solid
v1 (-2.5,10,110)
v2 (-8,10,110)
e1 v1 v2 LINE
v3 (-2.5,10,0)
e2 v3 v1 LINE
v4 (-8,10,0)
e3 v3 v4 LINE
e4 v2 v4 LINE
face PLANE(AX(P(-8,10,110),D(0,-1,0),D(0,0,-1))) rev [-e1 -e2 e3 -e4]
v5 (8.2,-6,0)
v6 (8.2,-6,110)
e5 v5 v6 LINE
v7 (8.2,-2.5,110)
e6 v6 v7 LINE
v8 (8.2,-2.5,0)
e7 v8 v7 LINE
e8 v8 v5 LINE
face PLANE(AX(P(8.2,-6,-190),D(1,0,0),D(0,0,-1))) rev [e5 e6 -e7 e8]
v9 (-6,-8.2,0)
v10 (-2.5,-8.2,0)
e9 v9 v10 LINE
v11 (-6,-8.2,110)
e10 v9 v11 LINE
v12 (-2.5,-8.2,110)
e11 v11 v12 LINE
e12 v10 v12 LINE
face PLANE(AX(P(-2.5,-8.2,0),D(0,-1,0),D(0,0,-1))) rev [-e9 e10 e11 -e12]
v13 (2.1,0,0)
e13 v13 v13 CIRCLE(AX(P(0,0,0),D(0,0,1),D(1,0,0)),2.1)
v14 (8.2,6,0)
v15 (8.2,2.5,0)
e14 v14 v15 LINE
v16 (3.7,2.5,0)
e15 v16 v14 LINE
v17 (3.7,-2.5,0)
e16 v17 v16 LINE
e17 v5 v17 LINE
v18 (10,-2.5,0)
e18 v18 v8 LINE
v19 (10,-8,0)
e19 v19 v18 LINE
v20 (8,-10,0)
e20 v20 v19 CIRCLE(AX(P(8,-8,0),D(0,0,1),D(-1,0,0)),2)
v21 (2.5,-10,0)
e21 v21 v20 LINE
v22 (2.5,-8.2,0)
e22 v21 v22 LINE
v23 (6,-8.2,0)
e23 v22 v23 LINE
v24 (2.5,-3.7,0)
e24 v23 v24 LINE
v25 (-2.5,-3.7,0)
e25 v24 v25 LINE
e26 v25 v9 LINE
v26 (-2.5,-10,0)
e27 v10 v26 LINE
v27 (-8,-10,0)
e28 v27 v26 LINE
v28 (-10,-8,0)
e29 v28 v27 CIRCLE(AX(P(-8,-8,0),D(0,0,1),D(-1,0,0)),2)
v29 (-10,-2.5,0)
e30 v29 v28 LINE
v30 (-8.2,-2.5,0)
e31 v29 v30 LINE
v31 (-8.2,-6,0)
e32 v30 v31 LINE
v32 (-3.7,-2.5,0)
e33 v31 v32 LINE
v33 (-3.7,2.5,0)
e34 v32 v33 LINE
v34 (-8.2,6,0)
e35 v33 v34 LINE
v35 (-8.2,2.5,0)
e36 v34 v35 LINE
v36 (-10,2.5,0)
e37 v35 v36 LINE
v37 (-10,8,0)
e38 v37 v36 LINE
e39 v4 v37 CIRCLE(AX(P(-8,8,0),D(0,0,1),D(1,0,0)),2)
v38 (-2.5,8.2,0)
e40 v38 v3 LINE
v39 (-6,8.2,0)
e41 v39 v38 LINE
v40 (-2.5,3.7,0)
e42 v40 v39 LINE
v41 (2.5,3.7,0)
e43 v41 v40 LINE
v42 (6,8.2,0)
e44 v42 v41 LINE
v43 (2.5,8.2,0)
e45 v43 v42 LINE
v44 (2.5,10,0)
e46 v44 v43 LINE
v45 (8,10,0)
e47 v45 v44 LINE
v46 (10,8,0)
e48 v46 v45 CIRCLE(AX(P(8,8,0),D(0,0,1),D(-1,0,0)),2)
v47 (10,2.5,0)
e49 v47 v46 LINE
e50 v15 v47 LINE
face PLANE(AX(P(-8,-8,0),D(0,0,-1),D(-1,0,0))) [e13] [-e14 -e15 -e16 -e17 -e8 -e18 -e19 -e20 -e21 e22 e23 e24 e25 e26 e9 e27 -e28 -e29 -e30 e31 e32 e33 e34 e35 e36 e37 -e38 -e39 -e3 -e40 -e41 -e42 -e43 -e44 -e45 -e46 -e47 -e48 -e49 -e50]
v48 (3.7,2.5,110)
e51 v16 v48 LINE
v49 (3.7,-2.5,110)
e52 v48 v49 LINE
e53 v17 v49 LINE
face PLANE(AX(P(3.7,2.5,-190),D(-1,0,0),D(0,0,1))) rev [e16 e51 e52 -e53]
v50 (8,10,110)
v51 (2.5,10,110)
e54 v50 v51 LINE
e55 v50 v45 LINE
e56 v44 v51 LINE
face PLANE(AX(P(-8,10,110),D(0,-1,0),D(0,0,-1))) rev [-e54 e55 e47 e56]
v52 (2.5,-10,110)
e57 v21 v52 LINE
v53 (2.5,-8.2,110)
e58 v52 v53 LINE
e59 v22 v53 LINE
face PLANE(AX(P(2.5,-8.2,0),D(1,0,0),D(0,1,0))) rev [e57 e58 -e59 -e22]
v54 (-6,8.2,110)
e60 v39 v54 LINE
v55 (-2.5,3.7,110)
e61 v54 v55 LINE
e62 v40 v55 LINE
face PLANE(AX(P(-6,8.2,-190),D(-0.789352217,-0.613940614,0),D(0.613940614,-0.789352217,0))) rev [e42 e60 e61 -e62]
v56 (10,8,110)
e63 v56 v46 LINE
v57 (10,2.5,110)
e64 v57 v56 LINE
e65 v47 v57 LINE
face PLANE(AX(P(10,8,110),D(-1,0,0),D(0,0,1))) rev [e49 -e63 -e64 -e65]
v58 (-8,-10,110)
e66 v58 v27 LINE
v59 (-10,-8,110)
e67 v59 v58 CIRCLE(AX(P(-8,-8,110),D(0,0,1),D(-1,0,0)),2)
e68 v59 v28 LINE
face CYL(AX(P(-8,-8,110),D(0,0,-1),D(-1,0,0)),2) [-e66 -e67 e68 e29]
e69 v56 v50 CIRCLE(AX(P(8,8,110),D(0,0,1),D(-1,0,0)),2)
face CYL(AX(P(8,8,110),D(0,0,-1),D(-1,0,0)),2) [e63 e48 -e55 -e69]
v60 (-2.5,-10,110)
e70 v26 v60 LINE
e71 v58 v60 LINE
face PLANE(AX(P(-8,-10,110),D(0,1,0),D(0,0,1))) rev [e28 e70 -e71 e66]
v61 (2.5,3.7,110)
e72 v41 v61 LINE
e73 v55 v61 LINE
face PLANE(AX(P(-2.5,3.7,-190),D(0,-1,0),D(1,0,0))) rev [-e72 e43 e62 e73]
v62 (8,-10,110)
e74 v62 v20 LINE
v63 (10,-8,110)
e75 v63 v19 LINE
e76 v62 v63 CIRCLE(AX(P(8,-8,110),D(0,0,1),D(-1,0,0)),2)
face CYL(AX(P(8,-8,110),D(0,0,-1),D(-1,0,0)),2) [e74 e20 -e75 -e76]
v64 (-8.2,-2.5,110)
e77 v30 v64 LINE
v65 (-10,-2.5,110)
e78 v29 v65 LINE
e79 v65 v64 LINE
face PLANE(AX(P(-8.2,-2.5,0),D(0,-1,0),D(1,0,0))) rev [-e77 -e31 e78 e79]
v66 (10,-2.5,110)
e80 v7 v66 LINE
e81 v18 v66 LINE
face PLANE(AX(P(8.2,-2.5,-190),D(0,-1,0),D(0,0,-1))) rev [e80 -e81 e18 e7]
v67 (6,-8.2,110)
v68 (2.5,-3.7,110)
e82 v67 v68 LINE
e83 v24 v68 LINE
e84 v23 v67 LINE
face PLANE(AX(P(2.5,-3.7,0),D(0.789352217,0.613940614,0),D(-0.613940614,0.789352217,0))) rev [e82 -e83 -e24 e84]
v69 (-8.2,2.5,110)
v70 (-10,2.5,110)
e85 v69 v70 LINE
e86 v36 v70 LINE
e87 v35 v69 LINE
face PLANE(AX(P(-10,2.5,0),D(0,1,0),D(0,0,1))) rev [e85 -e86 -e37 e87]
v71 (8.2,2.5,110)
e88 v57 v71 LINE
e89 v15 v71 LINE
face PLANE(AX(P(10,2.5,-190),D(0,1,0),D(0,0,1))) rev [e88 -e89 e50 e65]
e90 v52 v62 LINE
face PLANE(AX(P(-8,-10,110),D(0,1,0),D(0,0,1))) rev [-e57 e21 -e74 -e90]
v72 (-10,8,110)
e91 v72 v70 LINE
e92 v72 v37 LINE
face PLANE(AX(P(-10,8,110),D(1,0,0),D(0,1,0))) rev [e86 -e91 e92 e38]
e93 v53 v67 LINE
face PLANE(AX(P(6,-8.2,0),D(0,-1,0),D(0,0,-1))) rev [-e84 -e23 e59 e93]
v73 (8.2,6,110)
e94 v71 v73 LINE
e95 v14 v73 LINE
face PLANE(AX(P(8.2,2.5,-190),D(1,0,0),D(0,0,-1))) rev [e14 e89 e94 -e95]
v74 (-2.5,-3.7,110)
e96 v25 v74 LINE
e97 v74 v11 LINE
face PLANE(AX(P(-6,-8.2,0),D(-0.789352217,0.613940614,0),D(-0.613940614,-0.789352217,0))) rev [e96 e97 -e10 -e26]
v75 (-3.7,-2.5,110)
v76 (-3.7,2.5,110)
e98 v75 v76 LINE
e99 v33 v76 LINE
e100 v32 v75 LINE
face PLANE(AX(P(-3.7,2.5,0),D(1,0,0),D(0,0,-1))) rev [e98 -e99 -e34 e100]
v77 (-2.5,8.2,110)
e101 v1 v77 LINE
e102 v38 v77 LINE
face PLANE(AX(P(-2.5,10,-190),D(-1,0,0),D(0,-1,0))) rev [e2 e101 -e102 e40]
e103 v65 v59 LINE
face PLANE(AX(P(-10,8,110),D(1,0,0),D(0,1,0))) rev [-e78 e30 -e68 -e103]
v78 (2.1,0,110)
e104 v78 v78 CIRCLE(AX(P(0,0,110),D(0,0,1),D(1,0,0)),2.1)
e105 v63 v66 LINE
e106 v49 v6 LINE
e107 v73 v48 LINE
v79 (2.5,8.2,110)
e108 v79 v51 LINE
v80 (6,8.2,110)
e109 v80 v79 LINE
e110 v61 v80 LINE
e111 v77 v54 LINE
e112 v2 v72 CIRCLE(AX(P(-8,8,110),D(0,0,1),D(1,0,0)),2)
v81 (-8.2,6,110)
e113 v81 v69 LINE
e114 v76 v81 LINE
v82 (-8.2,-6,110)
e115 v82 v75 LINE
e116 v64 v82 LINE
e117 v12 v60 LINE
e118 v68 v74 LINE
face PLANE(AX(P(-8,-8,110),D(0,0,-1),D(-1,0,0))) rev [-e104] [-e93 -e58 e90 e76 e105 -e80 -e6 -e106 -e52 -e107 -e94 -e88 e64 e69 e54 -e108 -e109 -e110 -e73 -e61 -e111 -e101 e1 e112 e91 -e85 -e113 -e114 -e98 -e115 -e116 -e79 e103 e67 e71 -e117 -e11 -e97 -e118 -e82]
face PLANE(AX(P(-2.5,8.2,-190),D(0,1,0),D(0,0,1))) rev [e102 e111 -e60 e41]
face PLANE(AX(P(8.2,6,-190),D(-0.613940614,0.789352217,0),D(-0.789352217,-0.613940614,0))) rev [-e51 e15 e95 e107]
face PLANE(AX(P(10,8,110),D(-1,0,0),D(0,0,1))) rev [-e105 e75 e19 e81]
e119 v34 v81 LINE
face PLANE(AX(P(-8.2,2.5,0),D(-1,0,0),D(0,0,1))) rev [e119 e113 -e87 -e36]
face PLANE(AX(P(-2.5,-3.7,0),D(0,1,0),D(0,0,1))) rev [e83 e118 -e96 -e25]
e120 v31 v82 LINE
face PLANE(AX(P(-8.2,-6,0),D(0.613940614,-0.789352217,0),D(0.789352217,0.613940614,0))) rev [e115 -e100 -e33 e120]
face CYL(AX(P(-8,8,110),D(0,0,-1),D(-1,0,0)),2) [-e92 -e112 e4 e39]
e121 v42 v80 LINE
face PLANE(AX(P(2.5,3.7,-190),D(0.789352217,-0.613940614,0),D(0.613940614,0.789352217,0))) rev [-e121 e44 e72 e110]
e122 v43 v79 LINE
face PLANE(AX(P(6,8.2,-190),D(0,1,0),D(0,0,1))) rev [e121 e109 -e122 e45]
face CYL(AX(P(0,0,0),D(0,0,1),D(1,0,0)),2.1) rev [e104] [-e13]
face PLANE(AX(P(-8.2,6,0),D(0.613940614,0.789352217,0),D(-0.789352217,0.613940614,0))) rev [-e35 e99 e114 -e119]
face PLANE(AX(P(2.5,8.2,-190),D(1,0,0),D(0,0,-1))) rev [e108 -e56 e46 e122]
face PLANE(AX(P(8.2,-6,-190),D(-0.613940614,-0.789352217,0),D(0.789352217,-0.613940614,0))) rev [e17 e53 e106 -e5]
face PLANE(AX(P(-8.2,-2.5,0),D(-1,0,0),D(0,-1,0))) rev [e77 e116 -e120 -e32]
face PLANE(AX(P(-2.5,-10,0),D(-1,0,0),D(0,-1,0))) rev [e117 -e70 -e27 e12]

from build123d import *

# Parameters (mm, degrees)
EXTRUSION1_DEPTH        = 110
PER_AGE1_OUTLINE_R      = 2.1
PER_AGE1_DEPTH          = 110
ENL_V_MAT_EXTRU_1_DEPTH = 300
ENL_V_MAT_EXTRU_3_DEPTH = 300
ENL_V_MAT_EXTRU_4_DEPTH = 111.905365064
ENL_V_MAT_EXTRU_7_DEPTH = 111.905365064


# Read off the part's stored shape, not the designer's step: Perçage1
with BuildPart() as part:
    # Esquisse1 → Extrusion1 (new body)
    with BuildSketch(Plane.XY):
        with BuildLine():
            Line((-10, 8), (-10, -8))
            ThreePointArc((-10, -8), (-9.414213562, -9.414213562), (-8, -10))
            Line((-8, -10), (8, -10))
            ThreePointArc((8, -10), (9.414213562, -9.414213562), (10, -8))
            Line((10, -8), (10, 8))
            ThreePointArc((10, 8), (9.414213562, 9.414213562), (8, 10))
            Line((8, 10), (-8, 10))
            ThreePointArc((-8, 10), (-9.414213562, 9.414213562), (-10, 8))
        make_face()
    extrude(amount=EXTRUSION1_DEPTH)

    # Perçage1 outline → Perçage1 (cut)
    with BuildSketch(Plane.XY):
        Circle(PER_AGE1_OUTLINE_R)
    extrude(amount=PER_AGE1_DEPTH, mode=Mode.SUBTRACT)

    # Esquisse3 → Enlèv. mat.-Extru.1 (cut)
    with BuildSketch(Plane.XY.offset(110)):
        Polygon((10, 2.5), (8.2, 2.5), (8.2, 6), (3.7, 2.5), (3.7, -2.5), (8.2, -6), (8.2, -2.5), (10, -2.5), align=None)
    extrude(amount=-ENL_V_MAT_EXTRU_1_DEPTH, mode=Mode.SUBTRACT)

    # Esquisse5 → Enlèv. mat.-Extru.3 (cut)
    with BuildSketch(Plane.XY.offset(110)):
        Polygon((-2.5, 10), (-2.5, 8.2), (-6, 8.2), (-2.5, 3.7), (2.5, 3.7), (6, 8.2), (2.5, 8.2), (2.5, 10), align=None)
    extrude(amount=-ENL_V_MAT_EXTRU_3_DEPTH, mode=Mode.SUBTRACT)

    # Esquisse6 → Enlèv. mat.-Extru.4 (cut, through all)
    with BuildSketch(Plane.XY.offset(110)):
        Polygon((-2.5, -10), (-2.5, -8.2), (-6, -8.2), (-2.5, -3.7), (2.5, -3.7), (6, -8.2), (2.5, -8.2), (2.5, -10), align=None)
    extrude(amount=-ENL_V_MAT_EXTRU_4_DEPTH, mode=Mode.SUBTRACT)

    # Esquisse4 → Enlèv. mat.-Extru.7 (cut, through all)
    with BuildSketch(Plane.XY.offset(110)):
        Polygon((-10, 2.5), (-8.2, 2.5), (-8.2, 6), (-3.7, 2.5), (-3.7, -2.5), (-8.2, -6), (-8.2, -2.5), (-10, -2.5), align=None)
    extrude(amount=-ENL_V_MAT_EXTRU_7_DEPTH, mode=Mode.SUBTRACT)


solid = part.part
